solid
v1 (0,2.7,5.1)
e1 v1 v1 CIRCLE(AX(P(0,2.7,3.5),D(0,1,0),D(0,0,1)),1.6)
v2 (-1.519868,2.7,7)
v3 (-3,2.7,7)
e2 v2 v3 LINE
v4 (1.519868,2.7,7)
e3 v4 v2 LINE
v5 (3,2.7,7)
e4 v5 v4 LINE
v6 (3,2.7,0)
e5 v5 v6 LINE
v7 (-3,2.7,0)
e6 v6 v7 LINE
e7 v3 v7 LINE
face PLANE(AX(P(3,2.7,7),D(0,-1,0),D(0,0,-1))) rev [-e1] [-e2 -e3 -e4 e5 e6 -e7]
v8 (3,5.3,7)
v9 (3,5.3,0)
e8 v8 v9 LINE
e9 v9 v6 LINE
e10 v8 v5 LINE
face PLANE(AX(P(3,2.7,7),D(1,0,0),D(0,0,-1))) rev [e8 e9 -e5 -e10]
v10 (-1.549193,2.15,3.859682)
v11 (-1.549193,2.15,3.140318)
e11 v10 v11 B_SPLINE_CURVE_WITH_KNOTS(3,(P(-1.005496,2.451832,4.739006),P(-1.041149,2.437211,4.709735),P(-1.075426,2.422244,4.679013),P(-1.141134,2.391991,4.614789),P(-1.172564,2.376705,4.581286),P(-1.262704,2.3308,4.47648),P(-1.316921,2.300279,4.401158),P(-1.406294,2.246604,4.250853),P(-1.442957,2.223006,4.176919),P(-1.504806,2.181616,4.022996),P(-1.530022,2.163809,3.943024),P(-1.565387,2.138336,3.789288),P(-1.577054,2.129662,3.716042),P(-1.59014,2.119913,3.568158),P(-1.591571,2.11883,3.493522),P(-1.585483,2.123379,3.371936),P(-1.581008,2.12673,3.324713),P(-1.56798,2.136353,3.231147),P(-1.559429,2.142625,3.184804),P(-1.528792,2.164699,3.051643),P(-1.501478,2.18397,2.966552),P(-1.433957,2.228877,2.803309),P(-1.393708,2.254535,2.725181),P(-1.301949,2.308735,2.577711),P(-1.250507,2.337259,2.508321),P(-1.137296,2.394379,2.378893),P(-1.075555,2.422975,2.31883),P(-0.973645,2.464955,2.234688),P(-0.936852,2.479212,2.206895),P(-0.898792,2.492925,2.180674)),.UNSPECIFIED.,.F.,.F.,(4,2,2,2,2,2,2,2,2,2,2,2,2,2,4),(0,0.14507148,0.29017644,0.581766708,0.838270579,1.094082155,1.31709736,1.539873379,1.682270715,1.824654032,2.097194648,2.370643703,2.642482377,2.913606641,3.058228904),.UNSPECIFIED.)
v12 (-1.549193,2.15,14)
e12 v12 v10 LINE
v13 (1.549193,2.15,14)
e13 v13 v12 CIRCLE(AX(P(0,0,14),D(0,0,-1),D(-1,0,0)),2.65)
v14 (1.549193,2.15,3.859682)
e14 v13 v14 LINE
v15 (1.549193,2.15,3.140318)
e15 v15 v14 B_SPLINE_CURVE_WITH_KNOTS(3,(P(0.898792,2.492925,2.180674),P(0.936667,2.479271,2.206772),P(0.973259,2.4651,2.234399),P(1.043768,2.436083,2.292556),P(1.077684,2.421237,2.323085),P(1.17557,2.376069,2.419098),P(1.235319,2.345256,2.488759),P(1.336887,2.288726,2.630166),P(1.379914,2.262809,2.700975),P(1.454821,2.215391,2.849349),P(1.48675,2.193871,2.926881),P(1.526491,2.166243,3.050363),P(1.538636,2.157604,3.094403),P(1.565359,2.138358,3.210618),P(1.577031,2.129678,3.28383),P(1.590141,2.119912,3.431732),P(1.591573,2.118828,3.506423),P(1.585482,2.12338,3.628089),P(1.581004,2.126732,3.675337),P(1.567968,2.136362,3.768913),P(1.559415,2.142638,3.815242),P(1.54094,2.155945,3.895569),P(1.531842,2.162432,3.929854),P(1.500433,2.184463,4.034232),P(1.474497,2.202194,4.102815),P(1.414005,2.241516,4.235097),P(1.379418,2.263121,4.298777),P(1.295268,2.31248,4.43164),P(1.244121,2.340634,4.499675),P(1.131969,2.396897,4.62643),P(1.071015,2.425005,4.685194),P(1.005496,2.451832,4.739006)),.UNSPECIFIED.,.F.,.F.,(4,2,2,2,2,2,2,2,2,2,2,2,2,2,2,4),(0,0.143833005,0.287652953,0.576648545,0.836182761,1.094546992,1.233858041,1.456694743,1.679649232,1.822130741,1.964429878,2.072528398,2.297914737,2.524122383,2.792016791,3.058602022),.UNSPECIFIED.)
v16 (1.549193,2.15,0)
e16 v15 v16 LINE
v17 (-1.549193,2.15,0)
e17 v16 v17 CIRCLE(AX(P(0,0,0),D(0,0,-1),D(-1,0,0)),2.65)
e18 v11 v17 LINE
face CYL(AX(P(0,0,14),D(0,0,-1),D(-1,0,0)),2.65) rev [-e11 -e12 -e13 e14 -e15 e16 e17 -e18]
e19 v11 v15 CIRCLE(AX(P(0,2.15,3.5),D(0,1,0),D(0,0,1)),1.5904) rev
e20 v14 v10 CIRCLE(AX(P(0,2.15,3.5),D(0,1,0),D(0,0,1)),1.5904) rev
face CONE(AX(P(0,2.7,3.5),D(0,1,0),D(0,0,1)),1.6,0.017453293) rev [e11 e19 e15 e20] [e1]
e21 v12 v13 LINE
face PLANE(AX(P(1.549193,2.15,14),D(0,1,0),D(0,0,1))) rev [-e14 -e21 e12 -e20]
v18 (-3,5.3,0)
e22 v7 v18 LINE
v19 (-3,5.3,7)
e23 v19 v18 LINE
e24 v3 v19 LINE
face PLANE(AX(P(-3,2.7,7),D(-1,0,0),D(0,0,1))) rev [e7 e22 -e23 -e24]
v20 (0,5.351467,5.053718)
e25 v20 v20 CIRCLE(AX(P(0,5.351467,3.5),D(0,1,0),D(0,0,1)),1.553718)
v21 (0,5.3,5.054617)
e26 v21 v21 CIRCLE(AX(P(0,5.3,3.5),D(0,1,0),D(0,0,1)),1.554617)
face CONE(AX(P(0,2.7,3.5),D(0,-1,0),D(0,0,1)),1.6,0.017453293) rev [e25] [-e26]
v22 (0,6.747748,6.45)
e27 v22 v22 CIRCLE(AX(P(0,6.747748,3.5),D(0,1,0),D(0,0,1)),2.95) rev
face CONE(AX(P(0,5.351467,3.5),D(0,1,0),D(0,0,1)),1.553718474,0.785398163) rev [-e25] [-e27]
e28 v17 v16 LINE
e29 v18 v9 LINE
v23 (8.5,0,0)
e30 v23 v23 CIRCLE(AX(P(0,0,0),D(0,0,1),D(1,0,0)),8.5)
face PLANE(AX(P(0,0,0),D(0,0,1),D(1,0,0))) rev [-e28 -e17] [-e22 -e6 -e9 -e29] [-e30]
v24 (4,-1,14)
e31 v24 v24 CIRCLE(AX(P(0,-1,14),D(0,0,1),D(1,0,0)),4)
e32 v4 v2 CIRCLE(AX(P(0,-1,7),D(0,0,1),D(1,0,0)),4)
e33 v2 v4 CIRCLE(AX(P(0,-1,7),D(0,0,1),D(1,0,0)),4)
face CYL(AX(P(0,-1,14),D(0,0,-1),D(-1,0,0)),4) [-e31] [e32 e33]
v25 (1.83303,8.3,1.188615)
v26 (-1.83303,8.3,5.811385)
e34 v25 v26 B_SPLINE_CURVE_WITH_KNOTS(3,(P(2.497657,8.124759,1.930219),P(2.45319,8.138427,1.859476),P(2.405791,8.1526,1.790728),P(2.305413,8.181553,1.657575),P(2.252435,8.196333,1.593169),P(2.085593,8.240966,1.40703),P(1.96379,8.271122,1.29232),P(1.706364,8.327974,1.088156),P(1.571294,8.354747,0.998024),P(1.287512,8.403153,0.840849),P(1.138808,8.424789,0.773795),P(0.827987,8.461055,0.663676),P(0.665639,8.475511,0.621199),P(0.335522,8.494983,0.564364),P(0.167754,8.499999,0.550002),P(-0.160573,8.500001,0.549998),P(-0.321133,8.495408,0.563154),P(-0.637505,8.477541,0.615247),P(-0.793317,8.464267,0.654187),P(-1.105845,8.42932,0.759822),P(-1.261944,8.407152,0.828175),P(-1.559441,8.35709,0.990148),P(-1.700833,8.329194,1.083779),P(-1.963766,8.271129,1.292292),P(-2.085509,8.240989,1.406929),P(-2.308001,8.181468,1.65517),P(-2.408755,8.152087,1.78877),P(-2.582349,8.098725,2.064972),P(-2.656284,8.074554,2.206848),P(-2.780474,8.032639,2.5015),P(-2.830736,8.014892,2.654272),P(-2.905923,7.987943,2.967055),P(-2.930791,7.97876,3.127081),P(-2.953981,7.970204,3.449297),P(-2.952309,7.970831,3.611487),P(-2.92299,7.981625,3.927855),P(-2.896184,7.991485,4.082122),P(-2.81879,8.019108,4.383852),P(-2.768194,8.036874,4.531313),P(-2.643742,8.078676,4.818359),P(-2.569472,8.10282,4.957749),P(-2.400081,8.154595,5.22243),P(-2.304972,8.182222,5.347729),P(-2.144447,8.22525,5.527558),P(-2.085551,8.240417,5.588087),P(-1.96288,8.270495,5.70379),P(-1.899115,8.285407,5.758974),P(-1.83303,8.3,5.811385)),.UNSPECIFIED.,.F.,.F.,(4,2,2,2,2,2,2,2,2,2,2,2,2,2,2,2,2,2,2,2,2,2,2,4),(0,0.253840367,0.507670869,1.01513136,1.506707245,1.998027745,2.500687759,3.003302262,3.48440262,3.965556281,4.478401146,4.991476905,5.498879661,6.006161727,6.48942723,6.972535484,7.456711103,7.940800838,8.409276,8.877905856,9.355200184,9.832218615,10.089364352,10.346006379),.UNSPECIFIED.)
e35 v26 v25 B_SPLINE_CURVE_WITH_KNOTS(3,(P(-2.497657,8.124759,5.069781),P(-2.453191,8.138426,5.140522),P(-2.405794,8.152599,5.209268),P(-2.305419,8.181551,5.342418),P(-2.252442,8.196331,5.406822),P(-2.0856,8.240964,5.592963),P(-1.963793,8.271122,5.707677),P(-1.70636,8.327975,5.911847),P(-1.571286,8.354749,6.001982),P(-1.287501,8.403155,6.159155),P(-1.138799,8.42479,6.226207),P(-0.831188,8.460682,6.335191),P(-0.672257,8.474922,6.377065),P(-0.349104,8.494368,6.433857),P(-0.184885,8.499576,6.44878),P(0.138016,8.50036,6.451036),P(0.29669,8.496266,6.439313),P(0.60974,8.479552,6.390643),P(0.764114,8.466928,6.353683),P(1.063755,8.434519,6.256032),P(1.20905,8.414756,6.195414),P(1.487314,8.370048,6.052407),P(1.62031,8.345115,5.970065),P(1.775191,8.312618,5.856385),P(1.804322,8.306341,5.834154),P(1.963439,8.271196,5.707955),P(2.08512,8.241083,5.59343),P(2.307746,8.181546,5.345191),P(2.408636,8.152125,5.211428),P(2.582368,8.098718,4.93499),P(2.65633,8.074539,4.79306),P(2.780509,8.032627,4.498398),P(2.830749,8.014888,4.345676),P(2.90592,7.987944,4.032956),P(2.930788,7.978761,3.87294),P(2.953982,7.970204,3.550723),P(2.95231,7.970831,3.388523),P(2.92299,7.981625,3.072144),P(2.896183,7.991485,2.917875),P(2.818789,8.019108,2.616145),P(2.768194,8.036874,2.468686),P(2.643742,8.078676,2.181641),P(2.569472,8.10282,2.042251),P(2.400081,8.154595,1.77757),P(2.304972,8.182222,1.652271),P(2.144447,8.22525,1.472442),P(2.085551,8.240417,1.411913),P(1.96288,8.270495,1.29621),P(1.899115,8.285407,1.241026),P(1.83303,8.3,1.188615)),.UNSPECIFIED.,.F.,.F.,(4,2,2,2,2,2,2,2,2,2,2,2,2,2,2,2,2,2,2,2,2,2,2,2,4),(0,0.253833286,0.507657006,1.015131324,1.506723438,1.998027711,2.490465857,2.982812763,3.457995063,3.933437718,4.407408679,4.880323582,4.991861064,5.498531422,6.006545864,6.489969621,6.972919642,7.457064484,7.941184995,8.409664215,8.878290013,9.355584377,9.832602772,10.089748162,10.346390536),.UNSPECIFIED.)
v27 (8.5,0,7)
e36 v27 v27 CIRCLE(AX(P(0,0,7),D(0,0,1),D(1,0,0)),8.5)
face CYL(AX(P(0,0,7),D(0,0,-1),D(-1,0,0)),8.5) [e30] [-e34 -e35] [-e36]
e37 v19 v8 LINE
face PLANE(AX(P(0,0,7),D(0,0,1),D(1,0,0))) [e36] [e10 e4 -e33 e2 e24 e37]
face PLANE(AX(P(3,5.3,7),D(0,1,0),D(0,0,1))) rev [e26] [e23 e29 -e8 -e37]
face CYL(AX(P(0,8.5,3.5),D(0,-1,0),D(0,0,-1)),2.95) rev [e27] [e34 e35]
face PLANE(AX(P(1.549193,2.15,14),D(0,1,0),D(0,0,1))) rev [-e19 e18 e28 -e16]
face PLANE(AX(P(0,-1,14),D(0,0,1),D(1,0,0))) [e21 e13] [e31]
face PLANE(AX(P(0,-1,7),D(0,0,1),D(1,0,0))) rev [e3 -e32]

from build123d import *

# Parameters (mm, degrees)
ESQUISSE1_R             = 8.5
BOSS_EXTRU_1_DEPTH      = 7
ESQUISSE2_W             = 6
ESQUISSE2_H             = 2.6
ENL_V_MAT_EXTRU_1_DEPTH = 14.910427743
ESQUISSE7_R             = 2.95
ENL_V_MAT_EXTRU_8_DEPTH = 21.087060672
ESQUISSE9_R             = 4
BOSS_EXTRU_2_DEPTH      = 7
ENL_V_MAT_EXTRU_9_DEPTH = 19.45264218


with BuildPart() as part:
    # Esquisse1 → Boss.-Extru.1 (new body)
    with BuildSketch(Plane.XY):
        Circle(ESQUISSE1_R)
    extrude(amount=BOSS_EXTRU_1_DEPTH)

    # Esquisse2 → Enlèv. mat.-Extru.1 (cut, through all)
    with BuildSketch(Plane(origin=(0, 0, 0), x_dir=(-1, 0, 0), z_dir=(0, 0, -1))):
        with Locations((0, 4)):
            Rectangle(ESQUISSE2_W, ESQUISSE2_H)
    extrude(amount=-ENL_V_MAT_EXTRU_1_DEPTH, mode=Mode.SUBTRACT)

    # Enlèv. mat.-Extru.2: read off the stored shape, not the designer's step
    # Enlèv. mat.-Extru.2 outline → Enlèv. mat.-Extru.2 (revolve, cut)
    with BuildSketch(Plane.XY.offset(3.5)):
        Polygon((0, 5.3), (1.554616831, 5.3), (1.498760014, 8.500034923), (0, 8.500034923), align=None)
        Polygon((1.6, 2.7), (0, 2.7), (0, 0.7), (1.56508987, 0.7), align=None)
    revolve(axis=Axis((0, 0, 3.5), (0, 1, 0)), mode=Mode.SUBTRACT)

    # Esquisse7 → Enlèv. mat.-Extru.8 (cut, through all)
    with BuildSketch(Plane(origin=(0, 8.3, 0), x_dir=(1, 0, 0), z_dir=(0, 1, 0))):
        with Locations((0, -3.5)):
            Circle(ESQUISSE7_R)
    extrude(amount=ENL_V_MAT_EXTRU_8_DEPTH, mode=Mode.SUBTRACT)

    # Chanfrein1: read off the stored shape, not the designer's step
    # Chanfrein1 outline → Chanfrein1 (revolve, cut)
    with BuildSketch(Plane.XY.offset(3.5)):
        Polygon((2.95, 6.747748364), (2.95, 8.3), (1.502251636, 8.3), (1.553718474, 5.351466838), align=None)
    revolve(axis=Axis((0, 0, 3.5), (0, 1, 0)), mode=Mode.SUBTRACT)

    # Esquisse9 → Boss.-Extru.2 (add)
    with BuildSketch(Plane.XY.offset(7)):
        with Locations(Location((0, -1, 0), (0, 0, 112.331645009))):
            Circle(ESQUISSE9_R)
    extrude(amount=BOSS_EXTRU_2_DEPTH)

    # Esquisse10 → Enlèv. mat.-Extru.9 (cut, through all)
    with BuildSketch(Plane(origin=(0, 0, 0), x_dir=(-1, 0, 0), z_dir=(0, 0, -1))):
        with BuildLine():
            Line((-1.549193338, 2.15), (1.549193338, 2.15))
            ThreePointArc((1.549193338, 2.15), (0, -2.65), (-1.549193338, 2.15))
        make_face()
    extrude(amount=-ENL_V_MAT_EXTRU_9_DEPTH, mode=Mode.SUBTRACT)


solid = part.part
